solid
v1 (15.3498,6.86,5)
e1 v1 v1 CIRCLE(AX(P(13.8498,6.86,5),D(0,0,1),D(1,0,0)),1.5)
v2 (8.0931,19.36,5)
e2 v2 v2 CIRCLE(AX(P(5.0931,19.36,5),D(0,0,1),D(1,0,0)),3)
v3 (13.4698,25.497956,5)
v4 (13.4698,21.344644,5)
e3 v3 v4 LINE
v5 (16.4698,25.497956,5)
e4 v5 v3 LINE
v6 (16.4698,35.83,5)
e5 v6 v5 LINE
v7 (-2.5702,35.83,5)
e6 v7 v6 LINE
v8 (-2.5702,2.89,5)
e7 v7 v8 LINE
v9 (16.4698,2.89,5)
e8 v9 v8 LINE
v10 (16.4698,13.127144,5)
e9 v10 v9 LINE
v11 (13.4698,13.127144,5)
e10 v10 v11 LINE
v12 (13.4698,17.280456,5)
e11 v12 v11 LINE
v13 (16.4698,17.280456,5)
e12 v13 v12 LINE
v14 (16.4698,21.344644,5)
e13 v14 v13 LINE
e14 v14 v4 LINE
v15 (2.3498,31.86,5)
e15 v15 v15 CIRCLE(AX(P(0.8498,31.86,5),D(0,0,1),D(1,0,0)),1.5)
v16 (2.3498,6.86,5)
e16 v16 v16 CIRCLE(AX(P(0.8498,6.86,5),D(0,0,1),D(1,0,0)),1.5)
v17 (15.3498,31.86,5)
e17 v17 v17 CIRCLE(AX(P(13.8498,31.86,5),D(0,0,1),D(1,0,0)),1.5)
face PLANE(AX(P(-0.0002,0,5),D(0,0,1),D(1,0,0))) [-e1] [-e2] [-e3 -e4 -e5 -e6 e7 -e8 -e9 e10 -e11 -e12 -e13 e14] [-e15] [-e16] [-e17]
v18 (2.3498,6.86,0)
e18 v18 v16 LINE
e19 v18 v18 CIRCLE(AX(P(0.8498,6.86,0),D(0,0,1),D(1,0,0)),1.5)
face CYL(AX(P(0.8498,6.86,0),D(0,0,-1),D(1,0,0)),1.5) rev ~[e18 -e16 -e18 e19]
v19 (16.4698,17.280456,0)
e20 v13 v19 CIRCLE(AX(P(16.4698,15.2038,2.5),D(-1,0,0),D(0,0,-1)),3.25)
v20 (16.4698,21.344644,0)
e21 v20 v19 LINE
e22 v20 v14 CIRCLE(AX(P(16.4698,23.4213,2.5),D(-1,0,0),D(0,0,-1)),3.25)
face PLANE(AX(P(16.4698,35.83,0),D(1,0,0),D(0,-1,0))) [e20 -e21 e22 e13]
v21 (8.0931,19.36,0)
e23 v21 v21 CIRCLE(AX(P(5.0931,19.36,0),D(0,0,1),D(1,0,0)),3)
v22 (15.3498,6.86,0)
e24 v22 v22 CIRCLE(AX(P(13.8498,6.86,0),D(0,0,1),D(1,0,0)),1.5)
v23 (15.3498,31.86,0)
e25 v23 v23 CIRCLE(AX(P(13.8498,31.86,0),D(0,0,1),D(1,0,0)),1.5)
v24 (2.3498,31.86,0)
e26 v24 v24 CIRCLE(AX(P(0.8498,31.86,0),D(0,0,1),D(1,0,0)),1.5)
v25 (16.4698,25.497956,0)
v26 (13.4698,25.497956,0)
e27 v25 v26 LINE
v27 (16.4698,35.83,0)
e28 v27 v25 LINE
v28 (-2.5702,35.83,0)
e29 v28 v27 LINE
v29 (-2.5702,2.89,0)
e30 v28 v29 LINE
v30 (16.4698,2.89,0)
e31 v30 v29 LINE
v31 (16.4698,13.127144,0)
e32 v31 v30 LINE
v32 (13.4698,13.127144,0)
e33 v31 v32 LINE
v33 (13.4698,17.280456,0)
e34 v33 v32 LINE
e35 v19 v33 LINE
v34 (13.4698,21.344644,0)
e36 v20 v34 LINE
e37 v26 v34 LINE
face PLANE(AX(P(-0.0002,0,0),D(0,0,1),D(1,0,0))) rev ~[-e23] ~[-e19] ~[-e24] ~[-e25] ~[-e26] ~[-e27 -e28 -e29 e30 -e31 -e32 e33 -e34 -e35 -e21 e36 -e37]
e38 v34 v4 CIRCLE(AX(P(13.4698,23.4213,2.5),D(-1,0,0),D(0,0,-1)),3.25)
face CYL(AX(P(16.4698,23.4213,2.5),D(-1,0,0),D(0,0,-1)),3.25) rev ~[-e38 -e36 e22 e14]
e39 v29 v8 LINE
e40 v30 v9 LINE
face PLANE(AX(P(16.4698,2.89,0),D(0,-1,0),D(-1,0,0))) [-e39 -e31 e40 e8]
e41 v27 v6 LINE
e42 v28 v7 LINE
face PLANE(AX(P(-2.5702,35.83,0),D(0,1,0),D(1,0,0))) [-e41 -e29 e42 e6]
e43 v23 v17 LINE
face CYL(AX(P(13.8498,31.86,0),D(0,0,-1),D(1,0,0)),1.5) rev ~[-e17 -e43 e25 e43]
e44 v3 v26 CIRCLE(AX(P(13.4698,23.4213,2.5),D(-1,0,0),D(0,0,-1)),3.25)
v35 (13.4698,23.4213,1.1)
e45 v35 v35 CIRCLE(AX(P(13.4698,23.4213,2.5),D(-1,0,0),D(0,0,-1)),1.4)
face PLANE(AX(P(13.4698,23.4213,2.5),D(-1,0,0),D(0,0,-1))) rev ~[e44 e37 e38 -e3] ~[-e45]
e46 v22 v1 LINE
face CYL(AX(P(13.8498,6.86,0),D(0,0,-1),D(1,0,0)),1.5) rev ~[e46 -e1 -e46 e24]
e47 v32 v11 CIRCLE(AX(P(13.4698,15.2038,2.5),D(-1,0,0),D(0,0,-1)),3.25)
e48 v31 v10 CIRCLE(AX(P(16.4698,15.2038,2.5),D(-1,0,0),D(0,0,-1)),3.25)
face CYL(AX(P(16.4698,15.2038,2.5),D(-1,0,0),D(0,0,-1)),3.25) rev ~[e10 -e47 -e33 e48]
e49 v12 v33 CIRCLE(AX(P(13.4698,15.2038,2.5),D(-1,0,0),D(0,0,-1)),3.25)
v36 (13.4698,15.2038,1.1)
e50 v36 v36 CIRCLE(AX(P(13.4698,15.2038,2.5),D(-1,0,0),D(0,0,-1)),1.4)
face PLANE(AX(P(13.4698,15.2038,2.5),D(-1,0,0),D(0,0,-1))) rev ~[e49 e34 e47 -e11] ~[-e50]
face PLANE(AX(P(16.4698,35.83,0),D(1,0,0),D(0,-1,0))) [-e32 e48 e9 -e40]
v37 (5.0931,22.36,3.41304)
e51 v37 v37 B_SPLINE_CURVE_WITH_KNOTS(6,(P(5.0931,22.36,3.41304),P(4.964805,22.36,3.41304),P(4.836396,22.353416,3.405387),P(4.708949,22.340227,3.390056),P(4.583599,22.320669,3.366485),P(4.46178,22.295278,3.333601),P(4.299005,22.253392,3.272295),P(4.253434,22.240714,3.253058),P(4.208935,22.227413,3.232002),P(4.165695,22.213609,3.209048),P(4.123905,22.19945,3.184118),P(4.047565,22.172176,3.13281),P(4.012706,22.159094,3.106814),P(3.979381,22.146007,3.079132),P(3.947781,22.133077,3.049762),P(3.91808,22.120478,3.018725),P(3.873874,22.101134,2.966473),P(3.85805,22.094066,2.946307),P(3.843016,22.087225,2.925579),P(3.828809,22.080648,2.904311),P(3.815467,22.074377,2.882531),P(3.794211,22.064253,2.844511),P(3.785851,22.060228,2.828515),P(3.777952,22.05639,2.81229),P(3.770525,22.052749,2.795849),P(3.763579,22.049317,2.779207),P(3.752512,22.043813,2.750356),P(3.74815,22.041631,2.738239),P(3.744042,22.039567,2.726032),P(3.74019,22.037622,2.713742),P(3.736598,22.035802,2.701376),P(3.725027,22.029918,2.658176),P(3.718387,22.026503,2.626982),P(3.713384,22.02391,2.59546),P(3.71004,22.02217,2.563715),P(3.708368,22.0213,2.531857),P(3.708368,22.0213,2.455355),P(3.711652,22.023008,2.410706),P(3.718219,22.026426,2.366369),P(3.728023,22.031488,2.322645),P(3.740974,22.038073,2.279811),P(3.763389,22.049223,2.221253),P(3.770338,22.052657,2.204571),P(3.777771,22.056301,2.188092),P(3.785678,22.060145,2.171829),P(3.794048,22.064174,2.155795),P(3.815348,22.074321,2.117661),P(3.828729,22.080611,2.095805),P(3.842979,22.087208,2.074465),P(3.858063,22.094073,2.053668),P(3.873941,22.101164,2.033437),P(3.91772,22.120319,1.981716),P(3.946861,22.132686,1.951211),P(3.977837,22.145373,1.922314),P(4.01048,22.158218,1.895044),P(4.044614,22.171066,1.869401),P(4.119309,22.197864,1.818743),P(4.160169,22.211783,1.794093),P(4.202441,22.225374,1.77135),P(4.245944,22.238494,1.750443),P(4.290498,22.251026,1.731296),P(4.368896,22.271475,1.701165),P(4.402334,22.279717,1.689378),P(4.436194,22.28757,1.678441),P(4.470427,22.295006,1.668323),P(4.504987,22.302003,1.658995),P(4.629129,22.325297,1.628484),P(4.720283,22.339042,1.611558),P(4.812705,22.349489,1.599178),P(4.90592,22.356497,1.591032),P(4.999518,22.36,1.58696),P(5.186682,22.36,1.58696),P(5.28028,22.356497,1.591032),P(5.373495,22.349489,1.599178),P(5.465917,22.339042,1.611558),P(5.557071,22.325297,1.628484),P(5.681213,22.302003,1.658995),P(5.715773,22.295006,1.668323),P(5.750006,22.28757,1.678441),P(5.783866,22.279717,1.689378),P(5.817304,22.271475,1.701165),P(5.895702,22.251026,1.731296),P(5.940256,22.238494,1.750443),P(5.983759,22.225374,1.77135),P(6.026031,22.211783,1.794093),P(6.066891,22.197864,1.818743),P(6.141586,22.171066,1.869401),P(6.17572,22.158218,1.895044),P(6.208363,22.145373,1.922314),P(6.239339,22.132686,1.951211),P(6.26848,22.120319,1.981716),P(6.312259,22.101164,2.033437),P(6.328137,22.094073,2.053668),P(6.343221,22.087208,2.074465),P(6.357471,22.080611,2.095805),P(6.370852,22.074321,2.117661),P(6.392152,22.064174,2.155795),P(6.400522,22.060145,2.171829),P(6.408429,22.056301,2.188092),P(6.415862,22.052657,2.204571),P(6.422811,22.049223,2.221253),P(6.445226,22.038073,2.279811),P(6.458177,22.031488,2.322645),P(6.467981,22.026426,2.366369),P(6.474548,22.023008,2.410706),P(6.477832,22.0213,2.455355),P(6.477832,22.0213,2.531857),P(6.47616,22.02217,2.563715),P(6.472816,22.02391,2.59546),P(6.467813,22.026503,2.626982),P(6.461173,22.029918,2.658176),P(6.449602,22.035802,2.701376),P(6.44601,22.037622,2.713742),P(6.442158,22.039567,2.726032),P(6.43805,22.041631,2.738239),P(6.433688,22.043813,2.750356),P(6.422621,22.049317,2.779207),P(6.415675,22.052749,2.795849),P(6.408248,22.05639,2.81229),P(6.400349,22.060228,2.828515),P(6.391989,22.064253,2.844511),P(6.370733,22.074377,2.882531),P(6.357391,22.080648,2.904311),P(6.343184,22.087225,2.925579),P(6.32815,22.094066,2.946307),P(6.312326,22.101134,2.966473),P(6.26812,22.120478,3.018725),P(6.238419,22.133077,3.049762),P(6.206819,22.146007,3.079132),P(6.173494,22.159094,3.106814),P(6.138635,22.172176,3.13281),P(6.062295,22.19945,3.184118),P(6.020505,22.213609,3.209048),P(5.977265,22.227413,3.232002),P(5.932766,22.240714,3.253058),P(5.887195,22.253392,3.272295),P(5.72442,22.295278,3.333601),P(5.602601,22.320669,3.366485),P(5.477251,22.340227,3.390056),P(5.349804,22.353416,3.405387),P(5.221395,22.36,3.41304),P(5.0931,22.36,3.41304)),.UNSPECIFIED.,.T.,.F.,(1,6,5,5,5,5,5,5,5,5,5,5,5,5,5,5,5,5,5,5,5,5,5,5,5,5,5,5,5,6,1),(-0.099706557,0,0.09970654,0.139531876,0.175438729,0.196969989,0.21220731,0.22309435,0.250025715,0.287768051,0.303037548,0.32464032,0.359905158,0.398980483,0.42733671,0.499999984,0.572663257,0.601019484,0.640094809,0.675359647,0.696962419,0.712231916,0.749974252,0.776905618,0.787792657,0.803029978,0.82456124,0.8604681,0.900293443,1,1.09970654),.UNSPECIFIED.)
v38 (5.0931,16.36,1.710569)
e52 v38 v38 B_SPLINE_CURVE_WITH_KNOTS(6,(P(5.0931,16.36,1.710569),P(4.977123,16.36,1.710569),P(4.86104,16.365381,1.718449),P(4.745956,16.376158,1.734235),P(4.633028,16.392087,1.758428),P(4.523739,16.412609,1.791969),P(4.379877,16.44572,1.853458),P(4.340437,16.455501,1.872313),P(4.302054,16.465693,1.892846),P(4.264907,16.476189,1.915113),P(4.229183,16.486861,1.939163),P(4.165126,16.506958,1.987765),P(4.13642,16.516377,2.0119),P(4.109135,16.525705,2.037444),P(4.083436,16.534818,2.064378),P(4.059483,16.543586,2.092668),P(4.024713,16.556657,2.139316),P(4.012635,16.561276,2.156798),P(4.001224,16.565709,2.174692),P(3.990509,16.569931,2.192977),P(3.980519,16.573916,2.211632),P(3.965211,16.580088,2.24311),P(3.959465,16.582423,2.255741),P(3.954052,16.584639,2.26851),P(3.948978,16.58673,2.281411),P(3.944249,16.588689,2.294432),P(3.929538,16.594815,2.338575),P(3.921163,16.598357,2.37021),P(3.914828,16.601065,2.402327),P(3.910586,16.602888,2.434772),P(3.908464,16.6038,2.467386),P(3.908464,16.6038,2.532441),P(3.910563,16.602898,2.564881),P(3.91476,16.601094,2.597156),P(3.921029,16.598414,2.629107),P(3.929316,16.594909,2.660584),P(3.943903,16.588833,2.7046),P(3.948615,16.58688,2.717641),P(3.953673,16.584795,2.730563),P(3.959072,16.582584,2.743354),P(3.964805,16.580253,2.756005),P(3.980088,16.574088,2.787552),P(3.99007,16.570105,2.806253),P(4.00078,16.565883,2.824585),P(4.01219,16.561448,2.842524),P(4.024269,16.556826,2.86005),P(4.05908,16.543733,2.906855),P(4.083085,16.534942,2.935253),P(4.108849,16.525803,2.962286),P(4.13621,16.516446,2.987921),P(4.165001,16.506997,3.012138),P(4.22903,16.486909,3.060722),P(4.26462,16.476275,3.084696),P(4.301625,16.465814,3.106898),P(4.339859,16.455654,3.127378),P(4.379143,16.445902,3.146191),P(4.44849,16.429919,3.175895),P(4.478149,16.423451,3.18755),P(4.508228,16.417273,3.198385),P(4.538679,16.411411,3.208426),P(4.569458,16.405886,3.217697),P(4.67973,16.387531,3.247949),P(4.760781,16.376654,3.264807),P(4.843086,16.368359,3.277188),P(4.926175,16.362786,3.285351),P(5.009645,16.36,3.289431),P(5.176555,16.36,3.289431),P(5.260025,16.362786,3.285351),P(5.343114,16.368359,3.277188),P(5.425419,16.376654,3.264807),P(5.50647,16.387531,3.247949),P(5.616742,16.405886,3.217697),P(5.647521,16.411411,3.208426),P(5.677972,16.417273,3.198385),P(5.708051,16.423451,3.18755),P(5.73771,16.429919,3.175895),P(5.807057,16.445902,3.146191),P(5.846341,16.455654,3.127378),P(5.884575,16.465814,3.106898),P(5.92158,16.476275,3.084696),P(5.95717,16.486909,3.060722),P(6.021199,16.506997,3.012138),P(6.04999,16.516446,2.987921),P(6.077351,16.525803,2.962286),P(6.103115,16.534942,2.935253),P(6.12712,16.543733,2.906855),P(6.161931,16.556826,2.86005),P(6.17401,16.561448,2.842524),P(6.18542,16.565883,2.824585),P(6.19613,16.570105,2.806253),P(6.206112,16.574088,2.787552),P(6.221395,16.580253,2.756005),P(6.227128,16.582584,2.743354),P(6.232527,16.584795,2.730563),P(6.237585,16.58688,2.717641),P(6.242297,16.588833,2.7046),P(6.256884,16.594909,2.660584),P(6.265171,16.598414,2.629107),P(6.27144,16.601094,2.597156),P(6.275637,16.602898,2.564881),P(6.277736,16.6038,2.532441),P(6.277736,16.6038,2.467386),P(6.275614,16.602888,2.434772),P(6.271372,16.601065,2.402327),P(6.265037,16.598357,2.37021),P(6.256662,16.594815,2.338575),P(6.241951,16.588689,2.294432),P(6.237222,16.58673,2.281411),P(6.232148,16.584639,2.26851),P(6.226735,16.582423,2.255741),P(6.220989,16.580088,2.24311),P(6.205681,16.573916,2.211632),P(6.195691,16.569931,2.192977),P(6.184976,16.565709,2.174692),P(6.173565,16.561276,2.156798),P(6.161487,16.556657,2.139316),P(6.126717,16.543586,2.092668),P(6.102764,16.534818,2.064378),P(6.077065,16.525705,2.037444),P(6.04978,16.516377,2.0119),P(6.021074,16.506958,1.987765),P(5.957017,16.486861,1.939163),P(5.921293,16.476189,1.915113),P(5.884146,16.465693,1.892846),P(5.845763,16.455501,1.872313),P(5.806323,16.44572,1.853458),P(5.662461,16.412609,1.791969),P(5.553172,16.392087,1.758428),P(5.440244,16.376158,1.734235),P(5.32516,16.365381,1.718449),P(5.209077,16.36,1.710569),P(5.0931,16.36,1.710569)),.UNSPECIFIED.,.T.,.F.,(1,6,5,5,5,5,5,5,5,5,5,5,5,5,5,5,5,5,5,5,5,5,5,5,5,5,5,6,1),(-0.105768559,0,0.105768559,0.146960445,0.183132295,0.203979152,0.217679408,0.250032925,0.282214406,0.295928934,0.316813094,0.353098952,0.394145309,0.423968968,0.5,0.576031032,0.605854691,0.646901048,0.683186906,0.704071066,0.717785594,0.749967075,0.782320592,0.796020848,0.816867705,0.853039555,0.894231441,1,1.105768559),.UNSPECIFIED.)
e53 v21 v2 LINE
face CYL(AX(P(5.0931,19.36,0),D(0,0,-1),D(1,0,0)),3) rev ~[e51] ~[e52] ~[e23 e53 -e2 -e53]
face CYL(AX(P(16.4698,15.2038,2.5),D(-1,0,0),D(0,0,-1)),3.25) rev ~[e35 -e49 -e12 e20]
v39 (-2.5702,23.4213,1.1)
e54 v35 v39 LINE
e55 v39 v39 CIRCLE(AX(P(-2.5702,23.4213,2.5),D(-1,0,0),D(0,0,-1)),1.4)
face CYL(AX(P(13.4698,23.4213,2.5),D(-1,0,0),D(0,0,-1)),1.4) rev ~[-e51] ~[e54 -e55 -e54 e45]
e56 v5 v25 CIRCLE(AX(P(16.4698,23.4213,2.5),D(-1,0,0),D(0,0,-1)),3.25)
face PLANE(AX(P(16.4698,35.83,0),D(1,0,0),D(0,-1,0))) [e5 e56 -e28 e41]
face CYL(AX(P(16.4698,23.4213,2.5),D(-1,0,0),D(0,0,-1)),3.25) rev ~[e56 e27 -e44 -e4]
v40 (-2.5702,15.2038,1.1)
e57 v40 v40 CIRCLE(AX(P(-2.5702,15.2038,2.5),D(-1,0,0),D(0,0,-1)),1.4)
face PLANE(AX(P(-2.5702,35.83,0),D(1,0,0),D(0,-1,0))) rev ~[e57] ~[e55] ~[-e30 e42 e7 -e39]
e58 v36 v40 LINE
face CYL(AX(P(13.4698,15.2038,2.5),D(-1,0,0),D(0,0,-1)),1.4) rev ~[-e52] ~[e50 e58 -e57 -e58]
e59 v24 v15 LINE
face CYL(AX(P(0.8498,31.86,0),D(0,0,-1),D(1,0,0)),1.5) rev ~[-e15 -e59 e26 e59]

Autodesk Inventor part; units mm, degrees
ref_plane "YZ Plane" through (0, 0, 0) normal (1, 0, 0) x (0, 1, 0)
ref_plane "XZ Plane" through (0, 0, 0) normal (0, 1, 0) x (-1, 0, 0)
ref_plane "XY Plane" through (0, 0, 0) normal (0, 0, 1) x (1, 0, 0)
ref_plane "Arbeitsebene1" through (-0.0002, 0, 0) normal (0, 0, 1) x (1, 0, 0)
sketch "Skizze1" plane through (-0.0002, 0, 0) normal (0, 0, 1) x (1, 0, 0)
  circle A0 centre (13.85, 6.86) radius 1.5
  circle A1 centre (0.85, 31.86) radius 1.5
  circle A2 centre (13.85, 31.86) radius 1.5
  circle A3 centre (0.85, 6.86) radius 1.5
  circle A4 centre (5.0933, 19.36) radius 5.5
  line L0 (-3.07, 5.49) -> (-3.07, 33.23)
  line L1 (-3.07, 5.49) -> (-16.87, 5.49)
  line L2 (-16.87, 13.31) -> (-16.87, 5.49)
  line L3 (-16.8476, 13.31) -> (-16.87, 13.31)
  line L4 (-16.8476, 25.41) -> (-16.8476, 13.31)
  line L5 (-16.87, 25.41) -> (-16.8476, 25.41)
  line L6 (-16.87, 33.23) -> (-16.87, 25.41)
  line L7 (-3.07, 33.23) -> (-16.87, 33.23)
  line L8 (-16.87, 40.13) -> (-16.87, 44.21)
  line L9 (-20.77, 36.23) -> (-16.87, 40.13)
  line L10 (-24.85, 36.23) -> (-20.77, 36.23)
  line L11 (-24.85, 2.49) -> (-24.85, 36.23)
  line L12 (-20.77, 2.49) -> (-24.85, 2.49)
  line L13 (-16.87, -1.41) -> (-20.77, 2.49)
  line L14 (-16.87, -1.41) -> (-16.87, -5.49)
  line L15 (-16.87, -5.49) -> (16.87, -5.49)
  line L16 (16.87, -5.49) -> (16.87, -1.41)
  line L17 (20.77, 2.49) -> (16.87, -1.41)
  line L18 (24.85, 2.49) -> (20.77, 2.49)
  line L19 (24.85, 36.23) -> (24.85, 2.49)
  line L20 (20.77, 36.23) -> (24.85, 36.23)
  line L21 (16.87, 40.13) -> (20.77, 36.23)
  line L22 (16.87, 44.21) -> (16.87, 40.13)
  line L23 (-16.87, 44.21) -> (16.87, 44.21)
  line L24 (16.97, 36.33) -> (16.97, 2.39)
  line L25 (-16.97, 36.33) -> (16.97, 36.33) construction
  line L26 (-16.97, 2.39) -> (-16.97, 36.33)
  line L27 (16.97, 2.39) -> (-16.97, 2.39) construction
  line L28 (16.97, 2.39) -> (-16.97, 2.39)
  line L29 (16.47, 35.83) -> (16.47, 2.89)
  line L30 (16.47, 2.89) -> (-16.47, 2.89)
  line L31 (-16.47, 2.89) -> (-16.47, 35.83)
  line L32 (-16.47, 35.83) -> (16.47, 35.83)
  line L33 (-2.57, 35.83) -> (-2.57, 2.89)
  circle A5 centre (5.0933, 19.36) radius 3.505
  circle A6 centre (5.0933, 19.36) radius 3
  point P0 (0.0002, 0)
extrude "Extrusion1" add sketch "Skizze1" along normal blind 5 contours A4 | L33 L32 L29 L30 | A5
sketch "Skizze5" plane through (16.4698, 2.89, 0) normal (1, 0, 0) x (0, 0, -1)
  line L0 (-23, 19.975) -> (-13.08, 19.975)
  line L1 (-23, 12.965) -> (-13.08, 12.965)
  circle A0 centre (-2.5, 20.5313) radius 1.4
  circle A1 centre (-2.5, 12.3138) radius 1.4
  line L2 (0, 0) -> (0, 32.94) projected
  line L3 (0, 32.94) -> (-5, 32.94) projected
  line L4 (-5, 0) -> (-5, 32.94) projected
  line L5 (0, 0) -> (-5, 0) projected
  line L6 (-5, 13.47) -> (-5, 19.47) projected
  line L7 (0, 13.47) -> (0, 19.47) projected
  line L8 (-5, 32.94) -> (-5, 0) projected
  line L9 (-5, 0) -> (-5, 32.94) projected
  line L10 (-5, 2.47) -> (-5, 5.47) projected
  line L11 (-5, 27.47) -> (-5, 30.47) projected
  line L12 (-5, 27.47) -> (-5, 30.47) projected
  line L13 (-5, 2.47) -> (-5, 5.47) projected
  line L14 (-5, 13.47) -> (-5, 19.47) projected
  line L15 (-5, 19.47) -> (0, 19.47) projected
  line L16 (-5, 13.47) -> (0, 13.47) projected
  point P0 (0, -2.89)
  dimension "d19" = 2.8
  dimension "d20" = 2.8
hole "Bohrung2" at (16.4698, 23.4213, 2.5) at (16.4698, 15.2038, 2.5) direction (-1, 0, 0) diameter 2.8 depth 30 counterbore diameter 6.5 counterbore depth 3
properties part number "30_Cube_Z_Focus_NEMA8_captive_micrometerscrewbase_v0"
